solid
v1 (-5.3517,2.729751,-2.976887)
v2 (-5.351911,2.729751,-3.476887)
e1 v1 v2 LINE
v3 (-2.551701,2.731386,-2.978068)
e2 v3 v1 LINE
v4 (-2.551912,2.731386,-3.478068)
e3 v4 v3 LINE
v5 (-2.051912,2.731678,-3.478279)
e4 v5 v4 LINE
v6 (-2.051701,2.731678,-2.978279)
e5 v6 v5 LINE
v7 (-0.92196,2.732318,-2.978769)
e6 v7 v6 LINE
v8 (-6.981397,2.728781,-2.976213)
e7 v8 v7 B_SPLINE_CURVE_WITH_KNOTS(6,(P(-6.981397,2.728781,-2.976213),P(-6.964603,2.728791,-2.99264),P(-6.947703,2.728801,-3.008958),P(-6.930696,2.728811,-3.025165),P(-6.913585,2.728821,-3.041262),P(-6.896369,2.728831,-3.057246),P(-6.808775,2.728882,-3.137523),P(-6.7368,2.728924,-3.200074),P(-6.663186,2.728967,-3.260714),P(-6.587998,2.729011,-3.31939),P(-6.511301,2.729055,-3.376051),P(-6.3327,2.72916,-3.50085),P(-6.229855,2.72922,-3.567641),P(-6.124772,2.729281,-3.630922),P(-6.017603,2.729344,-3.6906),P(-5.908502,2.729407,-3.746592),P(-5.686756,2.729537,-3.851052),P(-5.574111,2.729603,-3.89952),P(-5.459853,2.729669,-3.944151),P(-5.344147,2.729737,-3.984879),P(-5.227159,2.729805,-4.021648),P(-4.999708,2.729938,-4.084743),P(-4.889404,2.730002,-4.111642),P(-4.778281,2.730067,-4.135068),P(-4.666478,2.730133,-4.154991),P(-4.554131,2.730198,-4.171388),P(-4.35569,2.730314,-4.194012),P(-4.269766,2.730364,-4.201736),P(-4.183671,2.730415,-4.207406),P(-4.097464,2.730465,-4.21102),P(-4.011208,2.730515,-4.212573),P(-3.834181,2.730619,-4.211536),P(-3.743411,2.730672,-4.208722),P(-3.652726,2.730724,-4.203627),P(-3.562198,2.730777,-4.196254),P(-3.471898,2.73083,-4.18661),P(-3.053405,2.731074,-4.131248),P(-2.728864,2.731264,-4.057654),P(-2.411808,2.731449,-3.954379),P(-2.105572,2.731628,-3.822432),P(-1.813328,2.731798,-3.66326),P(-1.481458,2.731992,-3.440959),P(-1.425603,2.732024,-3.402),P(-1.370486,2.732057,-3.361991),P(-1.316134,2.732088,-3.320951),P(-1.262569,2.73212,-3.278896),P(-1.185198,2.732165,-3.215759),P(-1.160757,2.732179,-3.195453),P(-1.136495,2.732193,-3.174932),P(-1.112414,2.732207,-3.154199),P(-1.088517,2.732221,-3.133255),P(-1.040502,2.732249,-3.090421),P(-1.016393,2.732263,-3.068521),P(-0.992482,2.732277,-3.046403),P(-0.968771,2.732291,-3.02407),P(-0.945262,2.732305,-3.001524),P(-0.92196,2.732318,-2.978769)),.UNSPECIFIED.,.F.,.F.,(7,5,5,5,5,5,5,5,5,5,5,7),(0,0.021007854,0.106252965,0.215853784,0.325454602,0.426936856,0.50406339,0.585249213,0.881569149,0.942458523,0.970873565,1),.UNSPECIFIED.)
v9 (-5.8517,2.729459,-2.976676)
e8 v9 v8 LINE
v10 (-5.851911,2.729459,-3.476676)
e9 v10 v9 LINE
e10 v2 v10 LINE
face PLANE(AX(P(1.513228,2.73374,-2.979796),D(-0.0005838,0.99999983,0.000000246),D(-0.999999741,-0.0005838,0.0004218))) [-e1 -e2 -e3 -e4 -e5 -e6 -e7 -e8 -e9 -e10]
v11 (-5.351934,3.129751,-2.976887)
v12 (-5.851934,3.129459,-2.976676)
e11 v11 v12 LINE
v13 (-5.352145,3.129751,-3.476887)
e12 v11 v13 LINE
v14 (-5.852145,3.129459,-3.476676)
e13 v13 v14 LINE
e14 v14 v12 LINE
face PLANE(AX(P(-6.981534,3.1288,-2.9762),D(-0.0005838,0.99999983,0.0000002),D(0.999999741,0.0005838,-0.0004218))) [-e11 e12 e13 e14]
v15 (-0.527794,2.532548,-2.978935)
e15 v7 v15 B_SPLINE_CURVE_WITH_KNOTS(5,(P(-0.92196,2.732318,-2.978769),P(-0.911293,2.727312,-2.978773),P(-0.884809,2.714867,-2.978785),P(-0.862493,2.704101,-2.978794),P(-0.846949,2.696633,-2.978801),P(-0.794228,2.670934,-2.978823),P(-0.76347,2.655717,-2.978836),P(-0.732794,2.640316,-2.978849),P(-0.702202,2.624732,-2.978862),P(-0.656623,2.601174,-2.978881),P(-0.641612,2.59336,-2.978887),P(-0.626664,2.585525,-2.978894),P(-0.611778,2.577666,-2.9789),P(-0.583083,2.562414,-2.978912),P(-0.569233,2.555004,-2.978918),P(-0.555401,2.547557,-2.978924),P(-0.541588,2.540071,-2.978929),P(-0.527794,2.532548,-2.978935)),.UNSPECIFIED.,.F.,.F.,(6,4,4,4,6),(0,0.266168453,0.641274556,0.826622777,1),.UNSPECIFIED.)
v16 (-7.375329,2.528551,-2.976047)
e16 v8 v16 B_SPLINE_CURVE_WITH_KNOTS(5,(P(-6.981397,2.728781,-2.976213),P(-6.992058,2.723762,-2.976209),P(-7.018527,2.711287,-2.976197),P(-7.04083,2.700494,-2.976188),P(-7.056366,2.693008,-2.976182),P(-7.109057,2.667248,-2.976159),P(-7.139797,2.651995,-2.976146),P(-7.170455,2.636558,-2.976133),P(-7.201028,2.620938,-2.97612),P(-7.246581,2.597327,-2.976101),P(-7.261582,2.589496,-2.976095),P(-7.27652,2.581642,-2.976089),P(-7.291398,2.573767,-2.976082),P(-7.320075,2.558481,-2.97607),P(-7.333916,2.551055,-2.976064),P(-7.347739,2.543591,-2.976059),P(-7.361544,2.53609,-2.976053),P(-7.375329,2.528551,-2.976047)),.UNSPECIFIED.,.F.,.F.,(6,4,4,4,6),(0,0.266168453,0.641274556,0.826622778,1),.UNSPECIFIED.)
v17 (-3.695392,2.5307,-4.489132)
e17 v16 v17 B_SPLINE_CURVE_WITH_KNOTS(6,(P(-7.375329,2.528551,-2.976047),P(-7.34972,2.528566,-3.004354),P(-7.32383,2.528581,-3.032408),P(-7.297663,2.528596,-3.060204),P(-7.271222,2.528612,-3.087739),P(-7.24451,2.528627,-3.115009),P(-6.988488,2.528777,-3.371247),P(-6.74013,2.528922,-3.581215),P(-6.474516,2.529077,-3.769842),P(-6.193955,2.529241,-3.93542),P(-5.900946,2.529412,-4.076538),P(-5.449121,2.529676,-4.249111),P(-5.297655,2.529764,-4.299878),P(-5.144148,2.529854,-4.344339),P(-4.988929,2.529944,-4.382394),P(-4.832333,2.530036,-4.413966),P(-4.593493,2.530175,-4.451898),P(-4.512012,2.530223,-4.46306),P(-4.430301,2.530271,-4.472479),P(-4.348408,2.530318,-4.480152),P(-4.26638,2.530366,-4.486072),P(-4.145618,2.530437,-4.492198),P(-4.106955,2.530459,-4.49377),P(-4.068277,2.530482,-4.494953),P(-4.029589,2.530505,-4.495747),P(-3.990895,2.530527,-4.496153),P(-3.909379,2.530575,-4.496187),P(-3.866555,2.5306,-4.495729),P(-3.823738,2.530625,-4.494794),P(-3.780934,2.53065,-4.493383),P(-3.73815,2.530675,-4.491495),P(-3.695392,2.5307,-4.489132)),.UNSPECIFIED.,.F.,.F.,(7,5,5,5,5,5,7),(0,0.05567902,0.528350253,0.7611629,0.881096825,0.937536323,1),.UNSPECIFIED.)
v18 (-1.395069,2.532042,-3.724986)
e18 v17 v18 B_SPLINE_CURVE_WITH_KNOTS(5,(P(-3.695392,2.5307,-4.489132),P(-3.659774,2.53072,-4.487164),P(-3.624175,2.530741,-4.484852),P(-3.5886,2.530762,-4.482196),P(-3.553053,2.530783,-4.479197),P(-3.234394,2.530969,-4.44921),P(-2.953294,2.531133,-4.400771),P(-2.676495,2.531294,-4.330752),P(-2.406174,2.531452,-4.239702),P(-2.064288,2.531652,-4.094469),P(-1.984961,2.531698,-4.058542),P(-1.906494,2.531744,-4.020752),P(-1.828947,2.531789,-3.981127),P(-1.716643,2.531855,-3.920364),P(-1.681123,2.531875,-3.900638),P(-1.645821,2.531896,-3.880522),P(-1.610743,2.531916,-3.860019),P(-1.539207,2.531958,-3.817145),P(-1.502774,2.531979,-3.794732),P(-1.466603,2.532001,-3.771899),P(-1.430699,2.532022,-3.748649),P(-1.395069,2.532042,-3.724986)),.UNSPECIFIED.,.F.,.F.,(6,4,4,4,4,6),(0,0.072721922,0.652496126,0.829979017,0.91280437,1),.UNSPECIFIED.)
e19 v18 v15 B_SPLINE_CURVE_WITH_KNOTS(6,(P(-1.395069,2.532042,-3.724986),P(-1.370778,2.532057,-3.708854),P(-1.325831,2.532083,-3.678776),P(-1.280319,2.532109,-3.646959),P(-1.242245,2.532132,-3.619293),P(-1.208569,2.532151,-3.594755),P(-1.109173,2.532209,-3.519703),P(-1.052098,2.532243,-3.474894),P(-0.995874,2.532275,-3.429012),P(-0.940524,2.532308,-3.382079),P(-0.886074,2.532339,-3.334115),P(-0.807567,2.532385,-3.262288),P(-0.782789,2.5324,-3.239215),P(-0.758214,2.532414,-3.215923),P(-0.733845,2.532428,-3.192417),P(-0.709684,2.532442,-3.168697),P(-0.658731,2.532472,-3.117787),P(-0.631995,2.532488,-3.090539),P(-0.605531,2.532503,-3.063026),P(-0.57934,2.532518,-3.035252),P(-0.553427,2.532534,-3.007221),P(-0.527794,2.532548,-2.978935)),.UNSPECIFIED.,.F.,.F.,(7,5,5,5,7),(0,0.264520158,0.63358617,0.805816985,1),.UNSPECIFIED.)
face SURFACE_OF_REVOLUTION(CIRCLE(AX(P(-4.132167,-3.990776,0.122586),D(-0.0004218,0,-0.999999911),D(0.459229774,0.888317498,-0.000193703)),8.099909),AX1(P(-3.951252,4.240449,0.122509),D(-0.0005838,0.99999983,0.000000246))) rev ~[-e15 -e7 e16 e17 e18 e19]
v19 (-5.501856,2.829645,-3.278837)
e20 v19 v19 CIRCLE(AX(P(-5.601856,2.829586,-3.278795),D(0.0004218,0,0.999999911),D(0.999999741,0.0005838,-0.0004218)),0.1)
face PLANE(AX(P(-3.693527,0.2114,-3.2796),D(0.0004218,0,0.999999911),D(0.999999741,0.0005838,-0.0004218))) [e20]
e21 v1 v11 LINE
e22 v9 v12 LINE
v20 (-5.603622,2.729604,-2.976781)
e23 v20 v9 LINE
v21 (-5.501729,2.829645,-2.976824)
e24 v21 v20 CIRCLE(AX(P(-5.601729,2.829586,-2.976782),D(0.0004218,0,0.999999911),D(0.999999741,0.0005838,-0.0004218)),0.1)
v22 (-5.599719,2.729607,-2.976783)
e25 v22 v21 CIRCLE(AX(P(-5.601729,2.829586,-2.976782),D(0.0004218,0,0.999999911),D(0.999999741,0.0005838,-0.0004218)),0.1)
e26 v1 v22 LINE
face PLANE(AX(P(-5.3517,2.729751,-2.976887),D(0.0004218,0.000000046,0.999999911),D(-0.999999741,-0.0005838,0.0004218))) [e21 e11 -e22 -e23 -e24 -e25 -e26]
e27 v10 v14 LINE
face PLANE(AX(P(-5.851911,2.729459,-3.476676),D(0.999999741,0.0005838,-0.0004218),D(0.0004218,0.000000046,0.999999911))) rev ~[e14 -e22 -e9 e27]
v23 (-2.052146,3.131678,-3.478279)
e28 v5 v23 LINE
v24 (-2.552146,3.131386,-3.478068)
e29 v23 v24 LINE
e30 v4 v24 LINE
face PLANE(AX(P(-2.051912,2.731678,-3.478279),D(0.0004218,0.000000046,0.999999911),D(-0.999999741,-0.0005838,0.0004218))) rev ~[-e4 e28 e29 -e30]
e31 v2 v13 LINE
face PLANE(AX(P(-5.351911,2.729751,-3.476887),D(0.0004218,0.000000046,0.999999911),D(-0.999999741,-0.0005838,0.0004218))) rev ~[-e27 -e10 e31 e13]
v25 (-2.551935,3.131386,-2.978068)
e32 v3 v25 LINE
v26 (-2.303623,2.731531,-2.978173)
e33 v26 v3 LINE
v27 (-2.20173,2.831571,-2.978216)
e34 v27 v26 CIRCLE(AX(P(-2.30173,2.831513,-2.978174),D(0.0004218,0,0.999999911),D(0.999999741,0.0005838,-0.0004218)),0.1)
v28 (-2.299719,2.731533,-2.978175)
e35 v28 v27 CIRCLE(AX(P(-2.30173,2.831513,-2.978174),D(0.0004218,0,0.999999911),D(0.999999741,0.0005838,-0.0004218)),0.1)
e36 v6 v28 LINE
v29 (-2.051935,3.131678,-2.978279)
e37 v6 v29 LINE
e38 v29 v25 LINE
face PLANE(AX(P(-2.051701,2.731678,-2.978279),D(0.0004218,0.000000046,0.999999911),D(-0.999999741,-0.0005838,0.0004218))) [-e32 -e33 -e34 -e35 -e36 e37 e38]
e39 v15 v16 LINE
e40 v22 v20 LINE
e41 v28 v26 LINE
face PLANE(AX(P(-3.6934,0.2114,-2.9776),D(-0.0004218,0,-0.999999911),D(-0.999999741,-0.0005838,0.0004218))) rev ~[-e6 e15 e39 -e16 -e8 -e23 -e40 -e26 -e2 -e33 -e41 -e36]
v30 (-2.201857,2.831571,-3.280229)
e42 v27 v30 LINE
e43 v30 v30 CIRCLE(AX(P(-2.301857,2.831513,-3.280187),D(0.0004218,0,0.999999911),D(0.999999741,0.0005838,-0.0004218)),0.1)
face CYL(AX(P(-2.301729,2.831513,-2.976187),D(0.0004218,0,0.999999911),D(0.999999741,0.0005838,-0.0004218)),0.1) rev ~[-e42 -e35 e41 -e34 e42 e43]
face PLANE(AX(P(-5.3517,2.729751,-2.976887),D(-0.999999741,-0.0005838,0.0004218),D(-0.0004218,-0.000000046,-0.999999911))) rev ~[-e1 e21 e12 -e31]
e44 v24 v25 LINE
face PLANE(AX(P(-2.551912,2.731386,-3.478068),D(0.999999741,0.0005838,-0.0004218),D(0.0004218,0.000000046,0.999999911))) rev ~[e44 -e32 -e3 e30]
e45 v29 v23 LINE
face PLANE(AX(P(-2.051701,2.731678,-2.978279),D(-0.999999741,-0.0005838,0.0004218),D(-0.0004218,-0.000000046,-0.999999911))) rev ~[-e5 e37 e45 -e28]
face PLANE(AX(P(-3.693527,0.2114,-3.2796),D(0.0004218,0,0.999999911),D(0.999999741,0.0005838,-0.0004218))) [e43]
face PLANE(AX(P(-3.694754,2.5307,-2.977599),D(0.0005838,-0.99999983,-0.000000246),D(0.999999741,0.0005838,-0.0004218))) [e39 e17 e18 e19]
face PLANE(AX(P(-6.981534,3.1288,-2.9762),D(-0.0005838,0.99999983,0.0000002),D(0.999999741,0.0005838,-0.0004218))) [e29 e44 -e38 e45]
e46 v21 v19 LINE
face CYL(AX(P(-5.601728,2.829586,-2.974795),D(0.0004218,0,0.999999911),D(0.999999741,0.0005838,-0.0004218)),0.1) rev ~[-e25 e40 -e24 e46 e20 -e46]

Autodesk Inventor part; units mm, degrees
ref_plane "YZ Plane" through (0, 0, 0) normal (1, 0, 0) x (0, 1, 0)
ref_plane "XZ Plane" through (0, 0, 0) normal (0, 1, 0) x (-1, 0, 0)
ref_plane "Plano de trabajo1" through (-3.6934, 0.2114, -2.9776) normal (-0.0004218, 0, -0.9999999) x (-0.9999997, -0.0005838, 0.0004218)
sketch "Boceto1" plane through (-3.6934, 0.2114, -2.9776) normal (-0.0004218, 0, -0.9999999) x (-0.9999997, -0.0005838, 0.0004218)
  line L0 (-3.0164, 1.9579) -> (1.1656, 1.9607) projected
  line L1 (0, 2.3193) -> (-2.3, 2.3193) projected
  line L2 (0, 2.3193) -> (-5.2081, 2.3193)
  line L3 (-5.2081, 2.3193) -> (-5.2081, 2.5193)
  line L4 (-5.2081, 2.5193) -> (5.9957, 2.5193)
  line L5 (5.9957, 2.5193) -> (5.9957, 2.3193)
  line L6 (0, 2.3193) -> (5.9957, 2.3193)
  point P0 (-3.692, -0.2136)
  dimension "d1" = 0.2
  dimension "d2" = 0.2
extrude "Extrusión1" add sketch "Boceto1" along normal blind 3
ref_plane "Plano de trabajo2" through (-3.6921, 0.2114, 0.1224) normal (-0.0004218, 0, -0.9999999) x (-0.9999997, -0.0005838, 0.0004218)
sketch "Boceto2" plane through (-3.6921, 0.2114, 0.1224) normal (-0.0004218, 0, -0.9999999) x (-0.9999997, -0.0005838, 0.0004218)
  line L0 (-7.8545, -5.065) -> (-7.6172, -5.0078)
  line L1 (-6.9665, -8.3558) -> (-7.6172, -5.0078)
  line L2 (-7.6172, -5.0078) -> (-6.9665, -8.3558)
  line L3 (-7.2432, -8.3558) -> (-6.9376, -8.3558)
  line L4 (-7.2432, -8.3558) -> (-6.9376, -8.3558)
  line L5 (-6.9665, -8.3558) -> (-7.2432, -8.3558)
  line L6 (-7.8545, -5.065) -> (-7.2432, -8.3558)
  line L7 (-7.8545, -5.065) -> (-7.2432, -8.3558)
  line L8 (-7.2432, -8.3558) -> (7.7568, -8.3558)
  arc A0 (-3.3928, 3.2058) -> (-7.8545, -5.065) centre (0.4426, -4.202) ccw
  arc A1 (0.2568, 4.0292) -> (-3.3486, 2.956) centre (1.1532, -5.5745) ccw
  line L9 (0.2568, 4.2722) -> (0.2568, 4.0292)
  arc A2 (0.2568, 4.2722) -> (-3.3928, 3.2058) centre (1.1532, -5.5745) ccw
  arc A3 (-3.2814, 2.9912) -> (-7.6172, -5.0078) centre (0.4426, -4.202) ccw
  line L10 (0.2568, -8.3558) -> (0.2568, 10.2551)
  line L11 (0.2568, 4.2722) -> (-10.676, 4.2722)
  line L12 (-10.676, 4.2722) -> (-10.676, -8.3558)
  line L13 (-7.2432, -8.3558) -> (-10.676, -8.3558)
  line L14 (0.2568, 4.2722) -> (-10.676, 4.2722)
  line L15 (-10.676, 4.2722) -> (-10.676, -8.3558)
  line L16 (-10.676, -8.3558) -> (-7.2432, -8.3558)
  line L17 (-7.2432, -8.3558) -> (-7.8545, -5.065)
  point P0 (-3.692, -0.2136)
  dimension "d6" = 15
revolve "Revolución1" cut sketch "Boceto2" angle 360 about axis through (-3.944, -8.1445, 0.1225) along (-0.0005838, 0.9999998, 0.0000002) contours A0 A2 L9 A1 A3 L0 | L6 L13 L12 L11 A2 A0
sketch "Boceto3" plane through (-6.9813, 2.7288, -2.9762) normal (-0.0005838, 0.9999998, 0.0000002) x (0.9999997, 0.0005838, -0.0004218)
  arc A0 (6.0592, 0) -> (0, 0) centre (3.0296, -3.1) ccw projected
  line L0 (6.0592, 0) -> (0, 0) projected
  line L1 (6.0592, 0) -> (0, 0) projected
  line L2 (3.0296, 0) -> (1.6296, 0)
  line L3 (1.6296, 0) -> (1.6296, 0.5)
  line L4 (1.6296, 0.5) -> (1.1296, 0.5)
  line L5 (1.1296, 0.5) -> (1.1296, 0)
  line L6 (1.1296, 0) -> (1.6296, 0)
  line L7 (3.0296, 0) -> (4.4296, 0)
  line L8 (4.4296, 0) -> (4.9296, 0)
  line L9 (4.9296, 0) -> (4.9296, 0.5)
  line L10 (4.9296, 0.5) -> (4.4296, 0.5)
  line L11 (4.4296, 0.5) -> (4.4296, 0)
  point P0 (6.9784, -2.9792)
  dimension "d8" = 1.4
  dimension "d9" = 0.5
  dimension "d10" = 0.5
  dimension "d11" = 0.5
  dimension "d12" = 1.4
  dimension "d13" = 0.5
  dimension "d14" = 0.5
  dimension "d15" = 0.5
extrude "Extrusión2" add sketch "Boceto3" along normal blind 0.4 contours L0 L11 L10 L9 | L5 L4 L3 L0
sketch "Boceto4" plane through (-3.6934, 0.2114, -2.9776) normal (0.0004218, 0, 0.9999999) x (0.9999997, 0.0005838, -0.0004218)
  line L0 (2.7728, 2.5193) -> (1.6432, 2.5193) projected
  line L1 (1.6432, 2.5193) -> (1.6432, 2.9193) projected
  line L2 (1.1432, 2.9193) -> (1.6432, 2.9193) projected
  line L3 (1.1432, 2.5193) -> (1.1432, 2.9193) projected
  line L4 (1.1432, 2.5193) -> (-1.6568, 2.5193) projected
  line L5 (-1.6568, 2.5193) -> (-1.6568, 2.9193) projected
  line L6 (-2.1568, 2.9193) -> (-1.6568, 2.9193) projected
  line L7 (-2.1568, 2.5193) -> (-2.1568, 2.9193) projected
  line L8 (-2.1568, 2.5193) -> (-3.2864, 2.5193) projected
  line L9 (-3.6805, 2.3193) -> (3.1669, 2.3193) projected
  circle A0 centre (-1.9068, 2.6193) radius 0.1
  circle A1 centre (1.3932, 2.6193) radius 0.1
  point P0 (3.692, -0.2136)
  dimension "d18" = 0.2
  dimension "d19" = 0.2
extrude "Extrusión3" cut sketch "Boceto4" against normal blind 0.3
properties part number "vs"
